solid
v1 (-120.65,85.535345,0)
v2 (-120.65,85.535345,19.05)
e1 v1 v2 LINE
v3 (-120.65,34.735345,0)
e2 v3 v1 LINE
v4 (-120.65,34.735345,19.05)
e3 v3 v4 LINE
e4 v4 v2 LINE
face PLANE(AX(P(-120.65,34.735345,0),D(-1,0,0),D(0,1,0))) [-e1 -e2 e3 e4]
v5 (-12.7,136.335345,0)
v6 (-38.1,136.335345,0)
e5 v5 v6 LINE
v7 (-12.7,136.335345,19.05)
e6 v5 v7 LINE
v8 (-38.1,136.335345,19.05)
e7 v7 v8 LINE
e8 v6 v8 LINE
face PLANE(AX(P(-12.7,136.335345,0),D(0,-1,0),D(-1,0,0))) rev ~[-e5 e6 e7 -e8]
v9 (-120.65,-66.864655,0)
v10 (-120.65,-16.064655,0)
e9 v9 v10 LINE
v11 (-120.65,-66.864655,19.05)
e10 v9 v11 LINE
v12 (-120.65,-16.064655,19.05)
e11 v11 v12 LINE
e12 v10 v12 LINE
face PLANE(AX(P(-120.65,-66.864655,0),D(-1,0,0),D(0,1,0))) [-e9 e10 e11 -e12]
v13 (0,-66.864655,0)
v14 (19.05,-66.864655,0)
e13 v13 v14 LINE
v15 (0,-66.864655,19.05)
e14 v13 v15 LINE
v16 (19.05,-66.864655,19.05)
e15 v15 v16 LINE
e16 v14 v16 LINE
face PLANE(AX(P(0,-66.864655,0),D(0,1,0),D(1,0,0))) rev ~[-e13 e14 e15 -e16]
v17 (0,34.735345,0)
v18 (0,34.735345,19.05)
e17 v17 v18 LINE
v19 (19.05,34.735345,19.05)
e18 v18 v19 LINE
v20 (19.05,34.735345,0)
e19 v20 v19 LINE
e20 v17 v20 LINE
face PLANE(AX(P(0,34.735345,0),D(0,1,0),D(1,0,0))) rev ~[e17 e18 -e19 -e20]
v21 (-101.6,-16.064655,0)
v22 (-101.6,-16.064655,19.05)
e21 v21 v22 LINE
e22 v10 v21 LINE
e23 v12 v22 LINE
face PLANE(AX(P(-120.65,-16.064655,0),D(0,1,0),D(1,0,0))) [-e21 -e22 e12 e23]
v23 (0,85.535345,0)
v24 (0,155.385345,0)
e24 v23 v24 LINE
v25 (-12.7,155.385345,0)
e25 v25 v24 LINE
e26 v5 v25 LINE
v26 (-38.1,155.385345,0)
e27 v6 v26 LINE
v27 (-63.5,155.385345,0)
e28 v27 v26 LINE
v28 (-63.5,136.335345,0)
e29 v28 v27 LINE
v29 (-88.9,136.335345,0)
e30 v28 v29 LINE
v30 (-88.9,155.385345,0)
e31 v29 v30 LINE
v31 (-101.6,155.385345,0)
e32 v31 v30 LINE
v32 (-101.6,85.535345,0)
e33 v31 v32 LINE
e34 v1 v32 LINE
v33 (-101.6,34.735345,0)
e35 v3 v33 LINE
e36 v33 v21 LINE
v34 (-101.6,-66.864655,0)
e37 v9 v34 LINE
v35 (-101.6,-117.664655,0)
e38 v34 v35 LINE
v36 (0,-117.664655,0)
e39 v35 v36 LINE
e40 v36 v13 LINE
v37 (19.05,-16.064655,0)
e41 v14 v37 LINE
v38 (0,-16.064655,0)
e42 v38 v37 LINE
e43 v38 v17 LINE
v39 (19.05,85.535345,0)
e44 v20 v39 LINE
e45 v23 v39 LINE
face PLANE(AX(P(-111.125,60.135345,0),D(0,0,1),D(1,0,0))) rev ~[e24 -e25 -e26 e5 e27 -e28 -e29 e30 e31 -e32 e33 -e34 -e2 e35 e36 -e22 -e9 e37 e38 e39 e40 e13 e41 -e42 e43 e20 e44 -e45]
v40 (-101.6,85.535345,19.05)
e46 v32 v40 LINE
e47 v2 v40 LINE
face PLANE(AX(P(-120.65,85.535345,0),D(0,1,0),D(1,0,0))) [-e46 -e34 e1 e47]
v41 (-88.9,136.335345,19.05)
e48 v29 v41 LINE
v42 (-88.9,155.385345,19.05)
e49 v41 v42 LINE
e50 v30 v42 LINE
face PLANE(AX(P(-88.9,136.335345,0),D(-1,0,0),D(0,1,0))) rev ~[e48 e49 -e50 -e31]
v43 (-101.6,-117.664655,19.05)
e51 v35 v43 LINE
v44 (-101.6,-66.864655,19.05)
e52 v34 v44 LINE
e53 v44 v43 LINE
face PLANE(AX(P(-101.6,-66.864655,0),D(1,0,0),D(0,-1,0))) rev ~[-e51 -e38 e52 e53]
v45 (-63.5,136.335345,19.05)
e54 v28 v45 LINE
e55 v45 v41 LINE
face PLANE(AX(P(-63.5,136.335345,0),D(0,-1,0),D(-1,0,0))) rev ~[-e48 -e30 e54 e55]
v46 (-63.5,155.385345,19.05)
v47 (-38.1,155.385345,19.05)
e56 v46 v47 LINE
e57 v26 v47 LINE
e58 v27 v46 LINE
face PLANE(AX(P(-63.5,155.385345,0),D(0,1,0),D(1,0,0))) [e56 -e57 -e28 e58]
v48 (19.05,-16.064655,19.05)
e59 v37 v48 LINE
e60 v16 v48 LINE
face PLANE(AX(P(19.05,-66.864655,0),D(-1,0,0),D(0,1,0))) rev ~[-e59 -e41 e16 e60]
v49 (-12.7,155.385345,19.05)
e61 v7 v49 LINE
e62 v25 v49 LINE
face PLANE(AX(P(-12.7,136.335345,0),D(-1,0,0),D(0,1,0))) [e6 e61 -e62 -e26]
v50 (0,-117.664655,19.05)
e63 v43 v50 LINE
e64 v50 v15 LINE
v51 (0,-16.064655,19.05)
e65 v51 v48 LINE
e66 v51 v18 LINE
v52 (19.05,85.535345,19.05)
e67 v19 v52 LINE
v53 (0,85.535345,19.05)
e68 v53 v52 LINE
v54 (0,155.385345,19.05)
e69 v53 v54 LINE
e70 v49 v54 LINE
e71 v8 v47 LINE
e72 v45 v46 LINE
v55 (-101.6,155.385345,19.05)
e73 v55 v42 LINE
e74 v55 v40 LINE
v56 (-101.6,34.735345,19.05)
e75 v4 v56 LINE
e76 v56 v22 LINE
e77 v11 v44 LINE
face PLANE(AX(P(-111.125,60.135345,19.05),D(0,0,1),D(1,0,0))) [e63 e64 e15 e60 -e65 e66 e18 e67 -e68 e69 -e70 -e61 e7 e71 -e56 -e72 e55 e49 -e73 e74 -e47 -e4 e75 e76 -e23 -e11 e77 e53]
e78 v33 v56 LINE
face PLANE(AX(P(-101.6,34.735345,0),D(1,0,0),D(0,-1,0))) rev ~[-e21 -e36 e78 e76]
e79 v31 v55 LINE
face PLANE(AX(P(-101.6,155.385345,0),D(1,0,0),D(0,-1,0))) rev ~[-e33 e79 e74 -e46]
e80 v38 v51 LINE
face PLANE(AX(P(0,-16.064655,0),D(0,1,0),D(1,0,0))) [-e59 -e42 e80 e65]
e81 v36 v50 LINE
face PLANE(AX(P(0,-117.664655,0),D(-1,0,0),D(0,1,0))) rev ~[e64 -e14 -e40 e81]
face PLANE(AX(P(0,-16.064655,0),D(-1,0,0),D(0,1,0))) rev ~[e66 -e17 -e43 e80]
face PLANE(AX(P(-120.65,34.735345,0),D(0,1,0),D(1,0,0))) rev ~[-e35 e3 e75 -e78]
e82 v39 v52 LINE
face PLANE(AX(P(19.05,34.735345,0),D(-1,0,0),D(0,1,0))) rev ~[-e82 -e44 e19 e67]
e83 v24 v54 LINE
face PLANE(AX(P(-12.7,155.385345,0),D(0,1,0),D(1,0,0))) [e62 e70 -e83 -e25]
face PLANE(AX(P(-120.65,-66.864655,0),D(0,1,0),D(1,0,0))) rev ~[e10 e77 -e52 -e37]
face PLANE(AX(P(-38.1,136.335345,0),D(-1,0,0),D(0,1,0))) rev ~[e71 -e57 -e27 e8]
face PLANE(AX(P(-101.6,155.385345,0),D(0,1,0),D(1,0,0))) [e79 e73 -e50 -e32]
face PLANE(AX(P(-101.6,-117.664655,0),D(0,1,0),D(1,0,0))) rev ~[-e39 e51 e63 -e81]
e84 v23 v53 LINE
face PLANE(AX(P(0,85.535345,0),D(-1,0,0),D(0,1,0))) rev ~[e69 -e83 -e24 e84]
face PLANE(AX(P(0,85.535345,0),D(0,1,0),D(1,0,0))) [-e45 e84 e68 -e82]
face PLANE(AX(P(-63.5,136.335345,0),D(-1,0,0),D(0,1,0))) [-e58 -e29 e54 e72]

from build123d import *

# Parameters (mm, degrees)
F0_W     = 19.05
F0_H     = 50.8
F0_W_2   = 25.4
F0_H_2   = 19.05
F0_W_3   = 12.7
F1_DEPTH = 19.05


with BuildPart() as f1:
    # F0 (on Top) → F1 (new body)
    with BuildSketch(Plane.XY):
        with Locations((-111.125, 60.1353453214)):
            Rectangle(F0_W, F0_H)
        with Locations((-111.125, -41.4646546786)):
            Rectangle(F0_W, F0_H)
        Polygon((-88.9, 136.3353453214), (-101.6, 136.3353453214), (-101.6, 85.5353453214), (-101.6, 34.7353453214), (-101.6, -16.0646546786), (-101.6, -66.8646546786), (-101.6, -117.6646546786), (0, -117.6646546786), (0, -101.2241342793), (0, -66.8646546786), (0, -16.0646546786), (0, 34.7353453214), (0, 85.5353453214), (0, 136.3353453214), (-12.7, 136.3353453214), (-25.4, 136.3353453214), (-38.1, 136.3353453214), (-63.5, 136.3353453214), align=None)
        with Locations((9.525, -41.4646546786)):
            Rectangle(F0_W, F0_H)
        with Locations((9.525, 60.1353453214)):
            Rectangle(F0_W, F0_H)
        with Locations((-50.8, 145.8603453214)):
            Rectangle(F0_W_2, F0_H_2)
        with Locations((-95.25, 145.8603453214)):
            Rectangle(F0_W_3, F0_H_2)
        with Locations((-6.35, 145.8603453214)):
            Rectangle(F0_W_3, F0_H_2)
    extrude(amount=F1_DEPTH)


solid = f1.part
